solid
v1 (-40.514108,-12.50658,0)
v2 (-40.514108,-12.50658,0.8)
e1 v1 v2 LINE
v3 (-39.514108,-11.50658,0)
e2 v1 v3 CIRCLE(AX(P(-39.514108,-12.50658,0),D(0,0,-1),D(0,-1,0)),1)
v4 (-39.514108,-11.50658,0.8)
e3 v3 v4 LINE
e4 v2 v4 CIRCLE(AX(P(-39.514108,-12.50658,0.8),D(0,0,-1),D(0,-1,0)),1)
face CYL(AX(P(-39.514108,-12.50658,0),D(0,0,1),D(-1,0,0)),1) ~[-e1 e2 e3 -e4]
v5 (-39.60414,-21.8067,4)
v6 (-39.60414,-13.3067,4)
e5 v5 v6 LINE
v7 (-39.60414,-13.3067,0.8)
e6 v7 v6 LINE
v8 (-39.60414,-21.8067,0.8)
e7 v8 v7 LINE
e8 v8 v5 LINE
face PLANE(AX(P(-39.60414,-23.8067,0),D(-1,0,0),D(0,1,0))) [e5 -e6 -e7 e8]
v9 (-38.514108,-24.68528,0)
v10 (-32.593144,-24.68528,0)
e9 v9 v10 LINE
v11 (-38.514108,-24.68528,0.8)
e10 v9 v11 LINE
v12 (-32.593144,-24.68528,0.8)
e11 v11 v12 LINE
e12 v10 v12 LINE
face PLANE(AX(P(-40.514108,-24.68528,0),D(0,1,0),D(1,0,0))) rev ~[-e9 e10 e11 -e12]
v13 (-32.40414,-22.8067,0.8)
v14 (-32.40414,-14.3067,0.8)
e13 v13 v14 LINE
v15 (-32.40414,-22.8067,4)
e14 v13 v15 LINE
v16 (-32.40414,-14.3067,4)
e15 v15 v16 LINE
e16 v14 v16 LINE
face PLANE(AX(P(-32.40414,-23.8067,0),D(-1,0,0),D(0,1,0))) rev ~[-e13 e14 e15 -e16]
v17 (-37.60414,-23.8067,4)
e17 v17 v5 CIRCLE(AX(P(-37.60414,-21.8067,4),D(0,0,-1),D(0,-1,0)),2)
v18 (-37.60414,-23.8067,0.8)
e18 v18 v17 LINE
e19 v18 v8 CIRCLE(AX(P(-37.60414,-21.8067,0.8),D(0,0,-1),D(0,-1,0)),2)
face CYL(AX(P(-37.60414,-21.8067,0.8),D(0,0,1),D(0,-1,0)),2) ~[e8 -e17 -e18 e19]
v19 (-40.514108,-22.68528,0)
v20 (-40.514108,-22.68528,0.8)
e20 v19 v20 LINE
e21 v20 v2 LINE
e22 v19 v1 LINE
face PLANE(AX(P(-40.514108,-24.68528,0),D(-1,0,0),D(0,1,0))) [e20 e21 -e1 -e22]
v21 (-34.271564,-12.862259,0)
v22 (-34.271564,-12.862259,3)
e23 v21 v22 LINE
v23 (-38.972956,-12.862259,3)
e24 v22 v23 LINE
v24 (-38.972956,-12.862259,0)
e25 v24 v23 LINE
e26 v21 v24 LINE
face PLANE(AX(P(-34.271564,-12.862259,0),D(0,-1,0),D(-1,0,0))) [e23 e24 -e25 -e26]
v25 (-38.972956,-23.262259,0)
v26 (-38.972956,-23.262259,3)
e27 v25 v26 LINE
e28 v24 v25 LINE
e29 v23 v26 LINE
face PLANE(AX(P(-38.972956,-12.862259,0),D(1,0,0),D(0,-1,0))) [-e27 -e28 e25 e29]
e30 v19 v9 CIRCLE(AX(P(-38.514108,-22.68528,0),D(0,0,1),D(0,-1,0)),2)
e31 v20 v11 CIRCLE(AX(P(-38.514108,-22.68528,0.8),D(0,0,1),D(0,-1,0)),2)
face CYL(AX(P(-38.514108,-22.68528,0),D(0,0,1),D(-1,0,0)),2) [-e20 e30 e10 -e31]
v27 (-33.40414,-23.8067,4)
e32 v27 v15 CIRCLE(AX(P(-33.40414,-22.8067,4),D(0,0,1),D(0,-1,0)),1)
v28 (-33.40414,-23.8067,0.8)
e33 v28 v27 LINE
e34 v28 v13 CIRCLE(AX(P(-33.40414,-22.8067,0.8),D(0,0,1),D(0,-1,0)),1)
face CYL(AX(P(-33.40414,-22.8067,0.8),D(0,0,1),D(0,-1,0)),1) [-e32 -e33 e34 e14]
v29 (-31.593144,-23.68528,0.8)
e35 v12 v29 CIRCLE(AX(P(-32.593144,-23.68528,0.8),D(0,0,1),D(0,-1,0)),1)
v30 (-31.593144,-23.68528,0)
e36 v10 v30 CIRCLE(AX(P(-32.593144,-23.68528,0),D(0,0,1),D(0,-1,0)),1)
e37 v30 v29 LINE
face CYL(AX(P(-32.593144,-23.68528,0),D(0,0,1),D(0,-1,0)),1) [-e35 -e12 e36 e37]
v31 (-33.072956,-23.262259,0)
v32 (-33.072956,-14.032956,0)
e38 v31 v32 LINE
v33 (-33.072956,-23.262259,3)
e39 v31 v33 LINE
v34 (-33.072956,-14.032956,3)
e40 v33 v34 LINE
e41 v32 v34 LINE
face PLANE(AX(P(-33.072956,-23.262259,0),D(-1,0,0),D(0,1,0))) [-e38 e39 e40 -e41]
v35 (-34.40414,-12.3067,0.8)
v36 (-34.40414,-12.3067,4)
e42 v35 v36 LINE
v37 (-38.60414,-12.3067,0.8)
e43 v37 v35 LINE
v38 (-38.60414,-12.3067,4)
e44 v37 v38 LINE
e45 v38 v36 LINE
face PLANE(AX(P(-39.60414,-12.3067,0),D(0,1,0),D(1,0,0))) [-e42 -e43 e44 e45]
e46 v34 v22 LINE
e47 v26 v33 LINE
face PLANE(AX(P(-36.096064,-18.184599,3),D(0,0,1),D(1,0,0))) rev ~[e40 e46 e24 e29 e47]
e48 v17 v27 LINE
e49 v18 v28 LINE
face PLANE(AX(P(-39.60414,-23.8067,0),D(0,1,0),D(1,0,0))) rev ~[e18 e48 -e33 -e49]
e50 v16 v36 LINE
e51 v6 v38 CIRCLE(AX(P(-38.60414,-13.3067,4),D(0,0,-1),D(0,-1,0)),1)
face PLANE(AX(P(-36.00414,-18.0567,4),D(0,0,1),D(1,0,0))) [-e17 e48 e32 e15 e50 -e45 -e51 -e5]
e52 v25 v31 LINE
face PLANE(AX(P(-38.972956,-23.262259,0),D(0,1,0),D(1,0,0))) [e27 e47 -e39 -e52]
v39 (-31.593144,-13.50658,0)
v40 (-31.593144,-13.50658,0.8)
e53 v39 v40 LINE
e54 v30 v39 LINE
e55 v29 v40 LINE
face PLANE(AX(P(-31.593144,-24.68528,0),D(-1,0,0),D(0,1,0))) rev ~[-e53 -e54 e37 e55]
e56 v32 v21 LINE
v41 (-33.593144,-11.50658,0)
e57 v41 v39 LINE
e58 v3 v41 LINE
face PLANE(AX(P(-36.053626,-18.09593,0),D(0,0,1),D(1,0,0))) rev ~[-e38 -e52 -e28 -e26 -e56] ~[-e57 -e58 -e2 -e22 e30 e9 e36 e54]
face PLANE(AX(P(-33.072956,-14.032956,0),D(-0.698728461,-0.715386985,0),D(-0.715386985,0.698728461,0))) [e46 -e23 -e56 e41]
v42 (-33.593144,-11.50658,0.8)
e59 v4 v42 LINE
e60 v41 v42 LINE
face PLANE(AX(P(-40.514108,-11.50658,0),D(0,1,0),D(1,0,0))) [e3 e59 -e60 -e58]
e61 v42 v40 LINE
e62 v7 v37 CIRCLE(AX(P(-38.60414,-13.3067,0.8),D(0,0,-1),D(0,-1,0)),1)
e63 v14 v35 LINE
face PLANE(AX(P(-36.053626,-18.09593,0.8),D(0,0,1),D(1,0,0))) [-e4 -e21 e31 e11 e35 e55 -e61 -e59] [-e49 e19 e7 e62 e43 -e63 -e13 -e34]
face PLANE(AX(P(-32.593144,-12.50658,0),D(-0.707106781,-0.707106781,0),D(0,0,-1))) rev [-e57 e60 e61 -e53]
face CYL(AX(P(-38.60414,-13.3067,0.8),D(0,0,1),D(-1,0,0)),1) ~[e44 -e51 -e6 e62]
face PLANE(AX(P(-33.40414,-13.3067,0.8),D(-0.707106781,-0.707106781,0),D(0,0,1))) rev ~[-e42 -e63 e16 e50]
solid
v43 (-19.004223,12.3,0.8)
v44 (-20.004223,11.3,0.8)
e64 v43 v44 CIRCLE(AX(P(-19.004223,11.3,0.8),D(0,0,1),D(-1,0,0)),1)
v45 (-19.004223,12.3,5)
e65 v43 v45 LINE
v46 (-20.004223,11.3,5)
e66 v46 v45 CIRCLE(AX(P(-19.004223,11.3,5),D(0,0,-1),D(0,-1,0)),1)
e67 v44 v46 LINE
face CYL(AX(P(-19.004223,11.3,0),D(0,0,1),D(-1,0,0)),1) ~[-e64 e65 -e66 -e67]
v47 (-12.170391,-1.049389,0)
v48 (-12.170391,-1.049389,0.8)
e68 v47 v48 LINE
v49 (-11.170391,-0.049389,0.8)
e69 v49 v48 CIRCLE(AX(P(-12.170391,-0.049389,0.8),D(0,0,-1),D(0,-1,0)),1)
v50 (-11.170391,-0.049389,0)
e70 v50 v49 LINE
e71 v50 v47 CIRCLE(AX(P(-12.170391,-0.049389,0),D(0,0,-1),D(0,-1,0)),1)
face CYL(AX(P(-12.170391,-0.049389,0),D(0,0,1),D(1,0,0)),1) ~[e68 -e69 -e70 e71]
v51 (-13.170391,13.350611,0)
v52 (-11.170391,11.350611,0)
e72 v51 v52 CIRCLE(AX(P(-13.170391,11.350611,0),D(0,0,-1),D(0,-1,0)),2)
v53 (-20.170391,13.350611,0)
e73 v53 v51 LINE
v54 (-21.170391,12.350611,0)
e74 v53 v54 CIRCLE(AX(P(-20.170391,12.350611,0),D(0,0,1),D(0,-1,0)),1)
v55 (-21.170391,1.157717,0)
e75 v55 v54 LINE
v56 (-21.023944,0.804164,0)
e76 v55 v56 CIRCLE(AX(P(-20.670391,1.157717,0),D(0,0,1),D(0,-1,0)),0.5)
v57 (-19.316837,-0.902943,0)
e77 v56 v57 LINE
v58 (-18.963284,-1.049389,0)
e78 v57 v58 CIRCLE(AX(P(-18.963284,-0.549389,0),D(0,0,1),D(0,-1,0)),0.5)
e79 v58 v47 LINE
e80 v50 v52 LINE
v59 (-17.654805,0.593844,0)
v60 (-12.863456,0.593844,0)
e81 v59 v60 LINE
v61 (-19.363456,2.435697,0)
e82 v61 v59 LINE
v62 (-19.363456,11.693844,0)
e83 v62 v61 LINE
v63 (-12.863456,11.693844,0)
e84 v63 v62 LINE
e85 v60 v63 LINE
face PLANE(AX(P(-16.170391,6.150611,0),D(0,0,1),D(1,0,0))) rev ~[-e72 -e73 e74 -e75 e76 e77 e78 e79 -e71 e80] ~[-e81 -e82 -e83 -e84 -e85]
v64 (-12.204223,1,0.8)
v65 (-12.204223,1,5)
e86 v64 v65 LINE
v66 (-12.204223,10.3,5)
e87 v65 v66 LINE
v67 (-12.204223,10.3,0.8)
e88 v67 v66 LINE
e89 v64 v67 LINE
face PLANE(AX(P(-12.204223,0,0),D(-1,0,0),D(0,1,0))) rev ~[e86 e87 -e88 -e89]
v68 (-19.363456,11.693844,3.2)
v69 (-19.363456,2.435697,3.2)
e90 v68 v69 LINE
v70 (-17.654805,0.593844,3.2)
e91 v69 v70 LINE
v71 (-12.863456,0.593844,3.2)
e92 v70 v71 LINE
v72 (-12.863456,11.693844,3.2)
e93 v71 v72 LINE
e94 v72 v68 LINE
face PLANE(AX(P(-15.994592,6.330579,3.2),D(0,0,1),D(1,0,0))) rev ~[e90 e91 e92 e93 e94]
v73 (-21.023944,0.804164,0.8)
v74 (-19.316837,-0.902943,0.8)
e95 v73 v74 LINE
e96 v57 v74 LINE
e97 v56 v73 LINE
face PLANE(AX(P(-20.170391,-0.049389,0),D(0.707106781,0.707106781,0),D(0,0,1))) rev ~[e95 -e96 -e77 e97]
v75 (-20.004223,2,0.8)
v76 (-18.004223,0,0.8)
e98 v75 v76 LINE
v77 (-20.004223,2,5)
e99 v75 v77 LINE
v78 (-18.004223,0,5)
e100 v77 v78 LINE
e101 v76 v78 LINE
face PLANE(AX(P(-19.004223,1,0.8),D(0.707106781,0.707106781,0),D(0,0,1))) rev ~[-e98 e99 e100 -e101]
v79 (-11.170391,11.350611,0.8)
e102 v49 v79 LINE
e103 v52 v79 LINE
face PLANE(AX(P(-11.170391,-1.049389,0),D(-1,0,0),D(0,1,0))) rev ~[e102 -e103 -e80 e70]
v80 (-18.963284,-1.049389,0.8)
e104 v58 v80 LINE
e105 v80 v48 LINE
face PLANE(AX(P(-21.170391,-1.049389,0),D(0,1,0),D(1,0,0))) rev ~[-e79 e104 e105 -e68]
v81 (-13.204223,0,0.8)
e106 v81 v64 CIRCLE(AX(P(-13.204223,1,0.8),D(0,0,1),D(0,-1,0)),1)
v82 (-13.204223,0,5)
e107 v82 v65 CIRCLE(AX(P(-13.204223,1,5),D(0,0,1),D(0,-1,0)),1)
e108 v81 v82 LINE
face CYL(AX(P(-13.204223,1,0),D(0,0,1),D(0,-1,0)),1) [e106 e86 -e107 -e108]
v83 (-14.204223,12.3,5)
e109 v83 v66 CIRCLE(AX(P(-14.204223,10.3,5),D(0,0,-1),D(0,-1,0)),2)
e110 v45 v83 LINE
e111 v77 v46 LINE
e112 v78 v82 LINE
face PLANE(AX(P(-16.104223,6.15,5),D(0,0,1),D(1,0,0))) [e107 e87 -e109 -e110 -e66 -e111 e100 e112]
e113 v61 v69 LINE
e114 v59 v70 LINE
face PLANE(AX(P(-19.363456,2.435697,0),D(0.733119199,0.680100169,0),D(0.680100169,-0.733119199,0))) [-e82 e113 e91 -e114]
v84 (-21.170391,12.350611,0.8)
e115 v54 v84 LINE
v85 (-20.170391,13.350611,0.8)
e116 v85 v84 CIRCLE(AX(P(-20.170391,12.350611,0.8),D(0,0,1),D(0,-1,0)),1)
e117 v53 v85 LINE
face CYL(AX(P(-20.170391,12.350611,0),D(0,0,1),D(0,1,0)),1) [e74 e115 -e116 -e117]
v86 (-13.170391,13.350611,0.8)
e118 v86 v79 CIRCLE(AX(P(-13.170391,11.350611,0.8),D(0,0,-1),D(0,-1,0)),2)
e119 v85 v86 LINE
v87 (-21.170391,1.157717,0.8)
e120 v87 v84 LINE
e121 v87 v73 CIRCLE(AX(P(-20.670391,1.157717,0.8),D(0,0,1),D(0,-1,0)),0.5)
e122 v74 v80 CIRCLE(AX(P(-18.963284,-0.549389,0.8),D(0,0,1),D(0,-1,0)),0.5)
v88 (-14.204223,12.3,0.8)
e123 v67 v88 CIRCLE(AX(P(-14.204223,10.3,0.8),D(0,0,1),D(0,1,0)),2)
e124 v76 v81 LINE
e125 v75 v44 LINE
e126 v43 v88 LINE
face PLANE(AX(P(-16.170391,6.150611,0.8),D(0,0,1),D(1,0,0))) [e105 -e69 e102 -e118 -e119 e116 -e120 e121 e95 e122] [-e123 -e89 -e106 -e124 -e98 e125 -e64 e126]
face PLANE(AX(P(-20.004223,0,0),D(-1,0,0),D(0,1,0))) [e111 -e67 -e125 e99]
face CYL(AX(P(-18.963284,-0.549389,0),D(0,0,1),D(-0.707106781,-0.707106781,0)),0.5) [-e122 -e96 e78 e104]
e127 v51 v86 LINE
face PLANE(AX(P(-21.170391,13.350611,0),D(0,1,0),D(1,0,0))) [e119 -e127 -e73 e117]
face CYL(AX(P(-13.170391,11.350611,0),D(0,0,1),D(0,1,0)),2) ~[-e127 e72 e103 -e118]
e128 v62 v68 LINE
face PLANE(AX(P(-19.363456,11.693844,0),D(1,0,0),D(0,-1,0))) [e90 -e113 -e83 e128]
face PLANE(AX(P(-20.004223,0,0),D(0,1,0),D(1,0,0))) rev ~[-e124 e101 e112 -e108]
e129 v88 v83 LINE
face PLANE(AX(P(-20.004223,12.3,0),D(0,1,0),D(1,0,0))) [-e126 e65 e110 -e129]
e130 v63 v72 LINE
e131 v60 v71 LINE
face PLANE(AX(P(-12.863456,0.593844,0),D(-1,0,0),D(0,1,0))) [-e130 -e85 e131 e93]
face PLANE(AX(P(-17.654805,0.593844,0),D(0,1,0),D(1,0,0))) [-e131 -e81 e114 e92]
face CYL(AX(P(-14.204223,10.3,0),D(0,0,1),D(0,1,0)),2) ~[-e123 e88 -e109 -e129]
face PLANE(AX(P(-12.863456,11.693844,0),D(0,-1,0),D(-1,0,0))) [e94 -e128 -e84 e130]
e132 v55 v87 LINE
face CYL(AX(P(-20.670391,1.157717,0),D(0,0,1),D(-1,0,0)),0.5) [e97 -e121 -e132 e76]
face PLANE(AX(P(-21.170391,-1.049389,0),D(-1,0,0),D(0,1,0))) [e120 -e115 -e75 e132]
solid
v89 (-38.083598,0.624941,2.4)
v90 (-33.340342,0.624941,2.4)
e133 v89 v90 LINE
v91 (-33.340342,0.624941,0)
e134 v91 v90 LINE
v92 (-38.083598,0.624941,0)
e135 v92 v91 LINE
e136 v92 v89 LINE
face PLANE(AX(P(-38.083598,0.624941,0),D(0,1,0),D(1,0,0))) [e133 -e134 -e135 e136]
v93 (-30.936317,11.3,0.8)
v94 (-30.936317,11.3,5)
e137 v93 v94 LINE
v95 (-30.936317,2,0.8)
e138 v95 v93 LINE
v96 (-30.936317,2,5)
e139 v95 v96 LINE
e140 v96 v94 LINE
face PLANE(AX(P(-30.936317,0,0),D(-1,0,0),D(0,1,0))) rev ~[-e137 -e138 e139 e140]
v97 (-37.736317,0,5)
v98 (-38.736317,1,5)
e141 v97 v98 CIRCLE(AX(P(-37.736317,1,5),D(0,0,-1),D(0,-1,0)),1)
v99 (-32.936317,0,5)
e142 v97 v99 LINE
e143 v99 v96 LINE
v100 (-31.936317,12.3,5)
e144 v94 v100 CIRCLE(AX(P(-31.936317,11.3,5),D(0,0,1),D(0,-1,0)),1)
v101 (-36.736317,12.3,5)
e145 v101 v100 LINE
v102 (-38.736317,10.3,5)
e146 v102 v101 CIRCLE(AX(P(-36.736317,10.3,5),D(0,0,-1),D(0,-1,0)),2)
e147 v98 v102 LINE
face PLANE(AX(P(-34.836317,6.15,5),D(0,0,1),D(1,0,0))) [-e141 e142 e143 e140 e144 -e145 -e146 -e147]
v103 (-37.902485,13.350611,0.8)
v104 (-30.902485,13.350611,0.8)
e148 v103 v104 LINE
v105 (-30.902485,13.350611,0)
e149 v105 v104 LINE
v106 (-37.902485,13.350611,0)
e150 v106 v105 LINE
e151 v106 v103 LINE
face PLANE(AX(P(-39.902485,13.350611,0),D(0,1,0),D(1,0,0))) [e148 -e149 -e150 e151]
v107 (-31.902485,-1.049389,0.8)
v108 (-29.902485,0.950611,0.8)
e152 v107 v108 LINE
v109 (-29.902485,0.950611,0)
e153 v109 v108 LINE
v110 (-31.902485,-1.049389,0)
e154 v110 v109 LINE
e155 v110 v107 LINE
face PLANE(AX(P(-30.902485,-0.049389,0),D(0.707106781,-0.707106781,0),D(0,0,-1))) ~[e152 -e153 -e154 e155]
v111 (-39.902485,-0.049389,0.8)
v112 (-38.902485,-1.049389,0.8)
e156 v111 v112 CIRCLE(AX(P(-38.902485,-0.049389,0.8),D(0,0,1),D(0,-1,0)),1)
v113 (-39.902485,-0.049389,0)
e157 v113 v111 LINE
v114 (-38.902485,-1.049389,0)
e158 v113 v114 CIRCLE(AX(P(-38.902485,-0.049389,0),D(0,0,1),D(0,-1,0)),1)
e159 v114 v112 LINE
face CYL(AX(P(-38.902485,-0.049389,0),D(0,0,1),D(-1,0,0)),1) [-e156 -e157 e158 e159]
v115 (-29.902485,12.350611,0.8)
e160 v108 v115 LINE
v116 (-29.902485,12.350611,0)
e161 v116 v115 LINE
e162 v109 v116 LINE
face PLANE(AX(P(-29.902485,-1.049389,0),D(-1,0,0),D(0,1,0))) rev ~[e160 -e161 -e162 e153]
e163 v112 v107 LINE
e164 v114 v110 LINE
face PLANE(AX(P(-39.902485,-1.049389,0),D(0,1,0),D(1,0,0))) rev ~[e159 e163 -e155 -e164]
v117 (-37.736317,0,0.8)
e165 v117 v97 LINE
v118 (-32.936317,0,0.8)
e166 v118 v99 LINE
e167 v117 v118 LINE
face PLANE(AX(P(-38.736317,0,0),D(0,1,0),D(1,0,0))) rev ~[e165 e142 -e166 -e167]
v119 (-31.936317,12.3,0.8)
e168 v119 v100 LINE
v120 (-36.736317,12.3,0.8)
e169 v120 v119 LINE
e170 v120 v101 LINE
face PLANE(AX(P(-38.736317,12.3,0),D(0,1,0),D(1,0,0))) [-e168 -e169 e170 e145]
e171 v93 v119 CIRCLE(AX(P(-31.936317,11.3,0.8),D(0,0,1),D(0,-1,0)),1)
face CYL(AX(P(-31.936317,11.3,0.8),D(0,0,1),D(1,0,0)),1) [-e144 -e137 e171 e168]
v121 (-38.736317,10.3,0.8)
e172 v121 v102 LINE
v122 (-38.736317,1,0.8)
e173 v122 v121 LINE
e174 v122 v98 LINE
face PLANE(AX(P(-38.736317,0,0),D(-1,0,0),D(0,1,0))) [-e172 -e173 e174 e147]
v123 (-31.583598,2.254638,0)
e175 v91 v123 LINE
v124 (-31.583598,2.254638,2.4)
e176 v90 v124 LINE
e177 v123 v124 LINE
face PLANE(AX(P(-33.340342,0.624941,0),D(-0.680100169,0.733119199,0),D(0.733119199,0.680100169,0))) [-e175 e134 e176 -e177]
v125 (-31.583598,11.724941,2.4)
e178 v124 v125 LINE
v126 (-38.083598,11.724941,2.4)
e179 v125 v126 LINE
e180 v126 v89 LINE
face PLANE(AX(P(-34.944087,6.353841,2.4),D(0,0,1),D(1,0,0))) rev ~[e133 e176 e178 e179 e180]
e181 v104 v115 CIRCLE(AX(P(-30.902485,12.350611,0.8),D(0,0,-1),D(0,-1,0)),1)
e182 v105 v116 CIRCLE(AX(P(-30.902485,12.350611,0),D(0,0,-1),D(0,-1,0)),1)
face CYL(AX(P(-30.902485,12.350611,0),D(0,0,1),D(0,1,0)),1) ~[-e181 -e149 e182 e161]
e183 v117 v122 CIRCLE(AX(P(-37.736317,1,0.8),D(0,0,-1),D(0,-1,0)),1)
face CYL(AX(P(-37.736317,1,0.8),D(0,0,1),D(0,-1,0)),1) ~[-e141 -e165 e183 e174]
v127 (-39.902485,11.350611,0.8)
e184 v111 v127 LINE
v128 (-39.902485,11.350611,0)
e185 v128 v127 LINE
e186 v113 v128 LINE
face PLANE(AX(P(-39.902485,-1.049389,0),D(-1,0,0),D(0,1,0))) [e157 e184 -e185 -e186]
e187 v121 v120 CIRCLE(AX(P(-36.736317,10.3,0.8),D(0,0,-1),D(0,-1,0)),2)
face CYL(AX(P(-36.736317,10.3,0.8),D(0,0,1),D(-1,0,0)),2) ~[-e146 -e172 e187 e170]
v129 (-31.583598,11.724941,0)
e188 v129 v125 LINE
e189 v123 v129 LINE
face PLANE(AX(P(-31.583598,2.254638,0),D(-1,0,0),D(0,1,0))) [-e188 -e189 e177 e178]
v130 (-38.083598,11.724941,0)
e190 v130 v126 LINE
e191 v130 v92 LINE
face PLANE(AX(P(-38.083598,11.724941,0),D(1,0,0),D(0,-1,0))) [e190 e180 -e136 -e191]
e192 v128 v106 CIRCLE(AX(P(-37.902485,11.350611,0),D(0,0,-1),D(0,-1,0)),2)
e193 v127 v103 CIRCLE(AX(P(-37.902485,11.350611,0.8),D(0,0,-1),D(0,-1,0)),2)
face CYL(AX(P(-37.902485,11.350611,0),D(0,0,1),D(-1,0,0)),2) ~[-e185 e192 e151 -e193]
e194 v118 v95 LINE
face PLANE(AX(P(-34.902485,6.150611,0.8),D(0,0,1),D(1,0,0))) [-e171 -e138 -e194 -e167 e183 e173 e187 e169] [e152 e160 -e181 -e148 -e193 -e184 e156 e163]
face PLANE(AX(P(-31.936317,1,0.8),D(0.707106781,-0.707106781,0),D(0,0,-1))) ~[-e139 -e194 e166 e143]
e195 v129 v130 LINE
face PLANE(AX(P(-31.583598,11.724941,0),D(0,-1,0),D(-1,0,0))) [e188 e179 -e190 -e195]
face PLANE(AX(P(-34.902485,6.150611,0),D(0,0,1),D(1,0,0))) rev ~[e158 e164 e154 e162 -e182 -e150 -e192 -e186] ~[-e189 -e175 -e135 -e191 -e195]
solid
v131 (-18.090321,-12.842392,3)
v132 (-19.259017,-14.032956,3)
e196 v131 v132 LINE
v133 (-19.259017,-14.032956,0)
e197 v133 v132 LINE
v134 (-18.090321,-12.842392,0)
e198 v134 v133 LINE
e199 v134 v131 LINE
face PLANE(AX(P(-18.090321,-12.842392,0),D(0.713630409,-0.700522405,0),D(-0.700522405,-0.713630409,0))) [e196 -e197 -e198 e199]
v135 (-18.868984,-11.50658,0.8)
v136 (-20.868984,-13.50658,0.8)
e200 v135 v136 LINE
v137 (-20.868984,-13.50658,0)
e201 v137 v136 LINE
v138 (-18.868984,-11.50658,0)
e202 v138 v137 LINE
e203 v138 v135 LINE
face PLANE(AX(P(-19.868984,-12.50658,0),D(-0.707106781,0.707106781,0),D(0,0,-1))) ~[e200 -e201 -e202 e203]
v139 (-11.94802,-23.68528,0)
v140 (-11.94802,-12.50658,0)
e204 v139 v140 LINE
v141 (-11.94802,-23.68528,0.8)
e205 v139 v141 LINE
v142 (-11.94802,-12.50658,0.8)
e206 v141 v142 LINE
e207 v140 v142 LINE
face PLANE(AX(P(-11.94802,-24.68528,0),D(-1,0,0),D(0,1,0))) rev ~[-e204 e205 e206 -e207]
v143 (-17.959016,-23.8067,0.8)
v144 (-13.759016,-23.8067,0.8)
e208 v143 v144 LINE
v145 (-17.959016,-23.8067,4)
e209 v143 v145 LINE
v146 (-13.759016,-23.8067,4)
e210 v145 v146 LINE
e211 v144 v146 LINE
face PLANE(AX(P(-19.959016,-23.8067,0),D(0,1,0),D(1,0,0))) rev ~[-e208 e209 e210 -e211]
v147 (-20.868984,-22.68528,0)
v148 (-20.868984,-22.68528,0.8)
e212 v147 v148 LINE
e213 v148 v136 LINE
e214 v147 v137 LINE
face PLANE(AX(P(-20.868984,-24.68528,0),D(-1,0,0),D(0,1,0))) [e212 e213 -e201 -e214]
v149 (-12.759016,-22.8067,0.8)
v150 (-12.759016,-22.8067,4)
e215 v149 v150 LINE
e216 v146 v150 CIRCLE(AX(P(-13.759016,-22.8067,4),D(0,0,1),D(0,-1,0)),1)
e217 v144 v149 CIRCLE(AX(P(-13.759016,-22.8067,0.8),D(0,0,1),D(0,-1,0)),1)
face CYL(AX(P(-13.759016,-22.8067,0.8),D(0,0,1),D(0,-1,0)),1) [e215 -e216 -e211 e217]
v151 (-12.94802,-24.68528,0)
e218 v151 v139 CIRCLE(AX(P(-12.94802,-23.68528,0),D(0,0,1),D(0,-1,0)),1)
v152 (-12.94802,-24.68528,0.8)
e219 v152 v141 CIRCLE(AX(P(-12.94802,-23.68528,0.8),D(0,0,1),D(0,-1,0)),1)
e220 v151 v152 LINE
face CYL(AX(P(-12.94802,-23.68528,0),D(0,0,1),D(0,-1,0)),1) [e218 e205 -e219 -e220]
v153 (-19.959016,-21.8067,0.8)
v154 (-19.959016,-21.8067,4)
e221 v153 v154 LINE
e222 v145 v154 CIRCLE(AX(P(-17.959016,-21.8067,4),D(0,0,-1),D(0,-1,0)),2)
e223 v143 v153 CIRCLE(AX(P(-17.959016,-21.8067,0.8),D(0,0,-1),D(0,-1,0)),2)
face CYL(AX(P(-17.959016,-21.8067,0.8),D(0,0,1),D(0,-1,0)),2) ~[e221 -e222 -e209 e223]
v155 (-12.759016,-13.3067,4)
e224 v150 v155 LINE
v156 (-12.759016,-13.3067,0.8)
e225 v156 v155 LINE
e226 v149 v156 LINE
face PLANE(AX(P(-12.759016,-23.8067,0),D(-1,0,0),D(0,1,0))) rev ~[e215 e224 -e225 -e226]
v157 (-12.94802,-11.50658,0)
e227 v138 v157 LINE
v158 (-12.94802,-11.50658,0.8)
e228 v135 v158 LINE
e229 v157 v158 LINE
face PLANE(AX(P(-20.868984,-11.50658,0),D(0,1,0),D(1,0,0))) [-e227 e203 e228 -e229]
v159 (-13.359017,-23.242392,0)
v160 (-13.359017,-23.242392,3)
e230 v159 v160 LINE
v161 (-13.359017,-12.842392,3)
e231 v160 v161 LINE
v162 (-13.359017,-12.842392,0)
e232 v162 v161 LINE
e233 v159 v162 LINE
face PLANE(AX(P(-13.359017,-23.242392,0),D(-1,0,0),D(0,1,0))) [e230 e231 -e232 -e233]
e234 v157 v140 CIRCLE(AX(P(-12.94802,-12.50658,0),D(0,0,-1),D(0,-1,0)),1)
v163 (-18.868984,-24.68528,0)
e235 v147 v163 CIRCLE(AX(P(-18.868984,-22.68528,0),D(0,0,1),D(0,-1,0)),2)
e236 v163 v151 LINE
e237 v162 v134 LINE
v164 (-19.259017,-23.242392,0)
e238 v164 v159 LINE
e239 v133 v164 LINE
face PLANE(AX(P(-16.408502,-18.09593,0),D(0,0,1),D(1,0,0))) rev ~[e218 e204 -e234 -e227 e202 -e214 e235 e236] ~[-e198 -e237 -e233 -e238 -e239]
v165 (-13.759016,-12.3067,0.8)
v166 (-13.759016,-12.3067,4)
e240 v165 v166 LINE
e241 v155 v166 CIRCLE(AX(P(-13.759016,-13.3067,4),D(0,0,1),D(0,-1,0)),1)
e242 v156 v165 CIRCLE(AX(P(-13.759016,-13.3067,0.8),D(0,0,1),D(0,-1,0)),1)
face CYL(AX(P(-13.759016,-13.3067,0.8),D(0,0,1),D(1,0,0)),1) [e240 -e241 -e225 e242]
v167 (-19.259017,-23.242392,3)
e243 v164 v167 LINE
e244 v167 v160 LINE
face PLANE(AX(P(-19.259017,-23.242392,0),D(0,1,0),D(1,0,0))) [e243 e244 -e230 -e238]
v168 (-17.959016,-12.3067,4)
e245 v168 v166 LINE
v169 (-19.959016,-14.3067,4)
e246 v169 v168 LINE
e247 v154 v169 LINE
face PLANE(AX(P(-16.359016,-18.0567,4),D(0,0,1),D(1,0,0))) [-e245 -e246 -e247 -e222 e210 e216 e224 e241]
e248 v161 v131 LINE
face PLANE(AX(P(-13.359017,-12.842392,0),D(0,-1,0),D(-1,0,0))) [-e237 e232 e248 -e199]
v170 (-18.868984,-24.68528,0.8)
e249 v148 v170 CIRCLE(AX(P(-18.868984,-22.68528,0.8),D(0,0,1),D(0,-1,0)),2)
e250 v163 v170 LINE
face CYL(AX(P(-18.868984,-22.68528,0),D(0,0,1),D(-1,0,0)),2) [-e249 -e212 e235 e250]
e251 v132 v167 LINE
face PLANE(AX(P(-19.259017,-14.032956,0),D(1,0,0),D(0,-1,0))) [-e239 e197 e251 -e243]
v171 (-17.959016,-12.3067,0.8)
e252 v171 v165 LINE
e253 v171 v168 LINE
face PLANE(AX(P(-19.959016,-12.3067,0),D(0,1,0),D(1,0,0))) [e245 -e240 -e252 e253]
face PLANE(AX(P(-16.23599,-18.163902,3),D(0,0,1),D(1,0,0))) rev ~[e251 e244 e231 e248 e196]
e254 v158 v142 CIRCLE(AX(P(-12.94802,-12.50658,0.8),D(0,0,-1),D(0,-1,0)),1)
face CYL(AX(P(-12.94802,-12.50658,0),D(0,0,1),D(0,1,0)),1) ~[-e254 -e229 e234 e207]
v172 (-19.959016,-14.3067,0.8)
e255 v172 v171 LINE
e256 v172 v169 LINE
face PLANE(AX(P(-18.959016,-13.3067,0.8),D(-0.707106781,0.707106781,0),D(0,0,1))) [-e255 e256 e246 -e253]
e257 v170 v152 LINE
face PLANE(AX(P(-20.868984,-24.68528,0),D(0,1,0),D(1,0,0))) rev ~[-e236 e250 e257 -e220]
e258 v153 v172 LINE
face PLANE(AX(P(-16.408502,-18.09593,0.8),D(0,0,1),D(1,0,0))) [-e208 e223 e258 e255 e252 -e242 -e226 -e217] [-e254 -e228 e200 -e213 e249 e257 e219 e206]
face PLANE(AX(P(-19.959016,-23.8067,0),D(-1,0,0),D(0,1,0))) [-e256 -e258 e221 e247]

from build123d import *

# Parameters (mm, degrees)
F0_W       = 7.8
F0_H       = 12.3
F1_DEPTH   = 5
F0_W_2     = 10
F0_H_2     = 14.4
F2_DEPTH   = 0.8
F3_R       = 1
F3_2_R     = 1
F4_R       = 2
F4_2_R     = 2
F5_DEPTH   = 0.8
F6_SIZE    = 2
F6_2_SIZE  = 2
F7_R       = 0.5
F8_R       = 2
F9_R       = 1
F10_W      = 7.2
F10_H      = 11.5
F11_DEPTH  = 4
F10_W_2    = 8.9209638536
F10_H_2    = 13.1787001155
F12_DEPTH  = 0.8
F13_R      = 2
F13_2_R    = 2
F14_R      = 1
F14_2_R    = 1
F15_DEPTH  = 3.2
F16_DEPTH  = 2.4
F17_DEPTH  = 3
F18_DEPTH  = 3
F19_SIZE   = 2
F19_2_SIZE = 2


with BuildPart() as f1:
    # F0 (on Top) → F1 (new body)
    with BuildSketch(Plane.XY):
        with Locations((-34.8363173068, 6.15)):
            Rectangle(F0_W, F0_H)
        Polygon((-38.0835977137, 0.6249411381), (-38.0835977137, 11.7249411381), (-31.5835977137, 11.7249411381), (-31.5835977137, 2.2546383552), (-31.5835977137, 0.6249411381), (-33.3403423429, 0.6249411381), align=None, mode=Mode.SUBTRACT)
        Polygon((-31.5835977137, 11.7249411381), (-38.0835977137, 11.7249411381), (-38.0835977137, 0.6249411381), (-33.3403423429, 0.6249411381), (-31.5835977137, 2.2546383552), align=None)
        Polygon((-31.5835977137, 0.6249411381), (-31.5835977137, 2.2546383552), (-33.3403423429, 0.6249411381), align=None)
    extrude(amount=F1_DEPTH)

    # F0 (on Top) → F2 (join)
    with BuildSketch(Plane.XY):
        with Locations((-34.9024849355, 6.1506106358)):
            Rectangle(F0_W_2, F0_H_2)
        with Locations((-34.8363173068, 6.15)):
            Rectangle(F0_W, F0_H, mode=Mode.SUBTRACT)
    extrude(amount=F2_DEPTH)

    # F3
    f3_edges = [f1.edges().sort_by_distance(p)[0] for p in [
        (-38.736317, 0, 2.9),
        (-39.902485, -1.049389, 0.4),
        (-29.902485, 13.350611, 0.4),
        (-30.936317, 12.3, 2.9),
    ]]
    fillet(f3_edges, radius=F3_R)

    # F4
    f4_edges = [f1.edges().sort_by_distance(p)[0] for p in [
        (-39.902485, 13.350611, 0.4),
        (-38.736317, 12.3, 2.9),
    ]]
    fillet(f4_edges, radius=F4_R)

    # F6
    f6_edges = [f1.edges().sort_by_distance(p)[0] for p in [
        (-29.902485, -1.049389, 0.4),
        (-30.936317, 0, 2.9),
    ]]
    chamfer(f6_edges, length=F6_SIZE)

    # F0 (on Top) → F16 (cut)
    with BuildSketch(Plane.XY):
        Polygon((-31.5835977137, 11.7249411381), (-38.0835977137, 11.7249411381), (-38.0835977137, 0.6249411381), (-33.3403423429, 0.6249411381), (-31.5835977137, 2.2546383552), align=None)
    extrude(amount=F16_DEPTH, mode=Mode.SUBTRACT)


with BuildPart() as f1b:
    # F0 (on Top) → F1, piece 2 (new body)
    with BuildSketch(Plane.XY):
        with Locations((-16.1042231411, 6.15)):
            Rectangle(F0_W, F0_H)
        Polygon((-19.3634564057, 2.4356972507), (-19.3634564057, 11.6938437534), (-12.8634564057, 11.6938437534), (-12.8634564057, 0.5938437534), (-17.6548053763, 0.5938437534), (-19.3634564057, 0.5938437534), align=None, mode=Mode.SUBTRACT)
        Polygon((-12.8634564057, 11.6938437534), (-19.3634564057, 11.6938437534), (-19.3634564057, 2.4356972507), (-17.6548053763, 0.5938437534), (-12.8634564057, 0.5938437534), align=None)
        Polygon((-17.6548053763, 0.5938437534), (-19.3634564057, 2.4356972507), (-19.3634564057, 0.5938437534), align=None)
    extrude(amount=F1_DEPTH)

    # F3#2
    f3_2_edges = [f1b.edges().sort_by_distance(p)[0] for p in [
        (-12.204223, 0, 2.5),
        (-20.004223, 12.3, 2.5),
    ]]
    fillet(f3_2_edges, radius=F3_2_R)

    # F4#2
    f4_2_edges = [f1b.edges().sort_by_distance(p)[0] for p in [
        (-12.204223, 12.3, 2.5),
    ]]
    fillet(f4_2_edges, radius=F4_2_R)

    # F0 (on Top) → F5 (join)
    with BuildSketch(Plane.XY):
        with Locations((-16.1703907698, 6.1506106358)):
            Rectangle(F0_W_2, F0_H_2)
        with Locations((-16.1042231411, 6.15)):
            Rectangle(F0_W, F0_H, mode=Mode.SUBTRACT)
        with Locations((-16.1042231411, 6.15)):
            Rectangle(F0_W, F0_H)
        Polygon((-19.3634564057, 2.4356972507), (-19.3634564057, 11.6938437534), (-12.8634564057, 11.6938437534), (-12.8634564057, 0.5938437534), (-17.6548053763, 0.5938437534), (-19.3634564057, 0.5938437534), align=None, mode=Mode.SUBTRACT)
        Polygon((-12.8634564057, 11.6938437534), (-19.3634564057, 11.6938437534), (-19.3634564057, 2.4356972507), (-17.6548053763, 0.5938437534), (-12.8634564057, 0.5938437534), align=None)
    extrude(amount=F5_DEPTH)

    # F6#2
    f6_2_edges = [f1b.edges().sort_by_distance(p)[0] for p in [
        (-21.170391, -1.049389, 0.4),
        (-20.004223, 0, 2.9),
    ]]
    chamfer(f6_2_edges, length=F6_2_SIZE)

    # F7
    f7_edges = [f1b.edges().sort_by_distance(p)[0] for p in [
        (-21.170391, 0.950611, 0.4),
        (-19.170391, -1.049389, 0.4),
    ]]
    fillet(f7_edges, radius=F7_R)

    # F8
    f8_edges = [f1b.edges().sort_by_distance(p)[0] for p in [
        (-11.170391, 13.350611, 0.4),
    ]]
    fillet(f8_edges, radius=F8_R)

    # F9
    f9_edges = [f1b.edges().sort_by_distance(p)[0] for p in [
        (-11.170391, -1.049389, 0.4),
        (-21.170391, 13.350611, 0.4),
    ]]
    fillet(f9_edges, radius=F9_R)

    # F0 (on Top) → F15 (cut)
    with BuildSketch(Plane.XY):
        Polygon((-12.8634564057, 11.6938437534), (-19.3634564057, 11.6938437534), (-19.3634564057, 2.4356972507), (-17.6548053763, 0.5938437534), (-12.8634564057, 0.5938437534), align=None)
    extrude(amount=F15_DEPTH, mode=Mode.SUBTRACT)


with BuildPart() as f11:
    # F10 (on Top) → F11 (new body)
    with BuildSketch(Plane.XY):
        with Locations((-36.0041396379, -18.056700483)):
            Rectangle(F10_W, F10_H)
        Polygon((-38.9729559064, -23.2622586191), (-38.9729559064, -12.8622586191), (-34.2715643346, -12.8622586191), (-33.0729559064, -12.8622586191), (-33.0729559064, -14.0329562128), (-33.0729559064, -23.2622586191), align=None, mode=Mode.SUBTRACT)
        Polygon((-34.2715643346, -12.8622586191), (-38.9729559064, -12.8622586191), (-38.9729559064, -23.2622586191), (-33.0729559064, -23.2622586191), (-33.0729559064, -14.0329562128), align=None)
        Polygon((-33.0729559064, -12.8622586191), (-34.2715643346, -12.8622586191), (-33.0729559064, -14.0329562128), align=None)
    extrude(amount=F11_DEPTH)

    # F10 (on Top) → F12 (join)
    with BuildSketch(Plane.XY):
        with Locations((-36.0536258668, -18.0959303398)):
            Rectangle(F10_W_2, F10_H_2)
        with Locations((-36.0041396379, -18.056700483)):
            Rectangle(F10_W, F10_H, mode=Mode.SUBTRACT)
        with Locations((-36.0041396379, -18.056700483)):
            Rectangle(F10_W, F10_H)
        Polygon((-38.9729559064, -23.2622586191), (-38.9729559064, -12.8622586191), (-34.2715643346, -12.8622586191), (-33.0729559064, -12.8622586191), (-33.0729559064, -14.0329562128), (-33.0729559064, -23.2622586191), align=None, mode=Mode.SUBTRACT)
    extrude(amount=F12_DEPTH)

    # F13
    f13_edges = [f11.edges().sort_by_distance(p)[0] for p in [
        (-39.60414, -23.8067, 2.4),
        (-40.514108, -24.68528, 0.4),
    ]]
    fillet(f13_edges, radius=F13_R)

    # F14
    f14_edges = [f11.edges().sort_by_distance(p)[0] for p in [
        (-32.40414, -23.8067, 2.4),
        (-31.593144, -24.68528, 0.4),
        (-39.60414, -12.3067, 2.4),
        (-40.514108, -11.50658, 0.4),
    ]]
    fillet(f14_edges, radius=F14_R)

    # F10 (on Top) → F17 (cut)
    with BuildSketch(Plane.XY):
        Polygon((-34.2715643346, -12.8622586191), (-38.9729559064, -12.8622586191), (-38.9729559064, -23.2622586191), (-33.0729559064, -23.2622586191), (-33.0729559064, -14.0329562128), align=None)
    extrude(amount=F17_DEPTH, mode=Mode.SUBTRACT)

    # F19
    f19_edges = [f11.edges().sort_by_distance(p)[0] for p in [
        (-32.40414, -12.3067, 2.4),
        (-31.593144, -11.50658, 0.4),
    ]]
    chamfer(f19_edges, length=F19_SIZE)


with BuildPart() as f11b:
    # F10 (on Top) → F11, piece 2 (new body)
    with BuildSketch(Plane.XY):
        with Locations((-16.3590158954, -18.056700483)):
            Rectangle(F10_W, F10_H)
        Polygon((-19.2590169609, -14.0329562128), (-19.2590169609, -12.8423916459), (-18.0903207511, -12.8423916459), (-13.3590169609, -12.8423916459), (-13.3590169609, -23.2423916459), (-19.2590169609, -23.2423916459), align=None, mode=Mode.SUBTRACT)
        Polygon((-18.0903207511, -12.8423916459), (-19.2590169609, -12.8423916459), (-19.2590169609, -14.0329562128), align=None)
        Polygon((-13.3590169609, -12.8423916459), (-18.0903207511, -12.8423916459), (-19.2590169609, -14.0329562128), (-19.2590169609, -23.2423916459), (-13.3590169609, -23.2423916459), align=None)
    extrude(amount=F11_DEPTH)

    # F10 (on Top) → F12, piece 2 (join)
    with BuildSketch(Plane.XY):
        with Locations((-16.4085021242, -18.0959303398)):
            Rectangle(F10_W_2, F10_H_2)
        with Locations((-16.3590158954, -18.056700483)):
            Rectangle(F10_W, F10_H, mode=Mode.SUBTRACT)
        with Locations((-16.3590158954, -18.056700483)):
            Rectangle(F10_W, F10_H)
        Polygon((-19.2590169609, -14.0329562128), (-19.2590169609, -12.8423916459), (-18.0903207511, -12.8423916459), (-13.3590169609, -12.8423916459), (-13.3590169609, -23.2423916459), (-19.2590169609, -23.2423916459), align=None, mode=Mode.SUBTRACT)
    extrude(amount=F12_DEPTH)

    # F13#2
    f13_2_edges = [f11b.edges().sort_by_distance(p)[0] for p in [
        (-19.959016, -23.8067, 2.4),
        (-20.868984, -24.68528, 0.4),
    ]]
    fillet(f13_2_edges, radius=F13_2_R)

    # F14#2
    f14_2_edges = [f11b.edges().sort_by_distance(p)[0] for p in [
        (-12.759016, -23.8067, 2.4),
        (-11.94802, -24.68528, 0.4),
        (-12.759016, -12.3067, 2.4),
        (-11.94802, -11.50658, 0.4),
    ]]
    fillet(f14_2_edges, radius=F14_2_R)

    # F10 (on Top) → F18 (cut)
    with BuildSketch(Plane.XY):
        Polygon((-13.3590169609, -12.8423916459), (-18.0903207511, -12.8423916459), (-19.2590169609, -14.0329562128), (-19.2590169609, -23.2423916459), (-13.3590169609, -23.2423916459), align=None)
    extrude(amount=F18_DEPTH, mode=Mode.SUBTRACT)

    # F19#2
    f19_2_edges = [f11b.edges().sort_by_distance(p)[0] for p in [
        (-19.959016, -12.3067, 2.4),
        (-20.868984, -11.50658, 0.4),
    ]]
    chamfer(f19_2_edges, length=F19_2_SIZE)


solid = Compound([f1.part, f1b.part, f11.part, f11b.part])
